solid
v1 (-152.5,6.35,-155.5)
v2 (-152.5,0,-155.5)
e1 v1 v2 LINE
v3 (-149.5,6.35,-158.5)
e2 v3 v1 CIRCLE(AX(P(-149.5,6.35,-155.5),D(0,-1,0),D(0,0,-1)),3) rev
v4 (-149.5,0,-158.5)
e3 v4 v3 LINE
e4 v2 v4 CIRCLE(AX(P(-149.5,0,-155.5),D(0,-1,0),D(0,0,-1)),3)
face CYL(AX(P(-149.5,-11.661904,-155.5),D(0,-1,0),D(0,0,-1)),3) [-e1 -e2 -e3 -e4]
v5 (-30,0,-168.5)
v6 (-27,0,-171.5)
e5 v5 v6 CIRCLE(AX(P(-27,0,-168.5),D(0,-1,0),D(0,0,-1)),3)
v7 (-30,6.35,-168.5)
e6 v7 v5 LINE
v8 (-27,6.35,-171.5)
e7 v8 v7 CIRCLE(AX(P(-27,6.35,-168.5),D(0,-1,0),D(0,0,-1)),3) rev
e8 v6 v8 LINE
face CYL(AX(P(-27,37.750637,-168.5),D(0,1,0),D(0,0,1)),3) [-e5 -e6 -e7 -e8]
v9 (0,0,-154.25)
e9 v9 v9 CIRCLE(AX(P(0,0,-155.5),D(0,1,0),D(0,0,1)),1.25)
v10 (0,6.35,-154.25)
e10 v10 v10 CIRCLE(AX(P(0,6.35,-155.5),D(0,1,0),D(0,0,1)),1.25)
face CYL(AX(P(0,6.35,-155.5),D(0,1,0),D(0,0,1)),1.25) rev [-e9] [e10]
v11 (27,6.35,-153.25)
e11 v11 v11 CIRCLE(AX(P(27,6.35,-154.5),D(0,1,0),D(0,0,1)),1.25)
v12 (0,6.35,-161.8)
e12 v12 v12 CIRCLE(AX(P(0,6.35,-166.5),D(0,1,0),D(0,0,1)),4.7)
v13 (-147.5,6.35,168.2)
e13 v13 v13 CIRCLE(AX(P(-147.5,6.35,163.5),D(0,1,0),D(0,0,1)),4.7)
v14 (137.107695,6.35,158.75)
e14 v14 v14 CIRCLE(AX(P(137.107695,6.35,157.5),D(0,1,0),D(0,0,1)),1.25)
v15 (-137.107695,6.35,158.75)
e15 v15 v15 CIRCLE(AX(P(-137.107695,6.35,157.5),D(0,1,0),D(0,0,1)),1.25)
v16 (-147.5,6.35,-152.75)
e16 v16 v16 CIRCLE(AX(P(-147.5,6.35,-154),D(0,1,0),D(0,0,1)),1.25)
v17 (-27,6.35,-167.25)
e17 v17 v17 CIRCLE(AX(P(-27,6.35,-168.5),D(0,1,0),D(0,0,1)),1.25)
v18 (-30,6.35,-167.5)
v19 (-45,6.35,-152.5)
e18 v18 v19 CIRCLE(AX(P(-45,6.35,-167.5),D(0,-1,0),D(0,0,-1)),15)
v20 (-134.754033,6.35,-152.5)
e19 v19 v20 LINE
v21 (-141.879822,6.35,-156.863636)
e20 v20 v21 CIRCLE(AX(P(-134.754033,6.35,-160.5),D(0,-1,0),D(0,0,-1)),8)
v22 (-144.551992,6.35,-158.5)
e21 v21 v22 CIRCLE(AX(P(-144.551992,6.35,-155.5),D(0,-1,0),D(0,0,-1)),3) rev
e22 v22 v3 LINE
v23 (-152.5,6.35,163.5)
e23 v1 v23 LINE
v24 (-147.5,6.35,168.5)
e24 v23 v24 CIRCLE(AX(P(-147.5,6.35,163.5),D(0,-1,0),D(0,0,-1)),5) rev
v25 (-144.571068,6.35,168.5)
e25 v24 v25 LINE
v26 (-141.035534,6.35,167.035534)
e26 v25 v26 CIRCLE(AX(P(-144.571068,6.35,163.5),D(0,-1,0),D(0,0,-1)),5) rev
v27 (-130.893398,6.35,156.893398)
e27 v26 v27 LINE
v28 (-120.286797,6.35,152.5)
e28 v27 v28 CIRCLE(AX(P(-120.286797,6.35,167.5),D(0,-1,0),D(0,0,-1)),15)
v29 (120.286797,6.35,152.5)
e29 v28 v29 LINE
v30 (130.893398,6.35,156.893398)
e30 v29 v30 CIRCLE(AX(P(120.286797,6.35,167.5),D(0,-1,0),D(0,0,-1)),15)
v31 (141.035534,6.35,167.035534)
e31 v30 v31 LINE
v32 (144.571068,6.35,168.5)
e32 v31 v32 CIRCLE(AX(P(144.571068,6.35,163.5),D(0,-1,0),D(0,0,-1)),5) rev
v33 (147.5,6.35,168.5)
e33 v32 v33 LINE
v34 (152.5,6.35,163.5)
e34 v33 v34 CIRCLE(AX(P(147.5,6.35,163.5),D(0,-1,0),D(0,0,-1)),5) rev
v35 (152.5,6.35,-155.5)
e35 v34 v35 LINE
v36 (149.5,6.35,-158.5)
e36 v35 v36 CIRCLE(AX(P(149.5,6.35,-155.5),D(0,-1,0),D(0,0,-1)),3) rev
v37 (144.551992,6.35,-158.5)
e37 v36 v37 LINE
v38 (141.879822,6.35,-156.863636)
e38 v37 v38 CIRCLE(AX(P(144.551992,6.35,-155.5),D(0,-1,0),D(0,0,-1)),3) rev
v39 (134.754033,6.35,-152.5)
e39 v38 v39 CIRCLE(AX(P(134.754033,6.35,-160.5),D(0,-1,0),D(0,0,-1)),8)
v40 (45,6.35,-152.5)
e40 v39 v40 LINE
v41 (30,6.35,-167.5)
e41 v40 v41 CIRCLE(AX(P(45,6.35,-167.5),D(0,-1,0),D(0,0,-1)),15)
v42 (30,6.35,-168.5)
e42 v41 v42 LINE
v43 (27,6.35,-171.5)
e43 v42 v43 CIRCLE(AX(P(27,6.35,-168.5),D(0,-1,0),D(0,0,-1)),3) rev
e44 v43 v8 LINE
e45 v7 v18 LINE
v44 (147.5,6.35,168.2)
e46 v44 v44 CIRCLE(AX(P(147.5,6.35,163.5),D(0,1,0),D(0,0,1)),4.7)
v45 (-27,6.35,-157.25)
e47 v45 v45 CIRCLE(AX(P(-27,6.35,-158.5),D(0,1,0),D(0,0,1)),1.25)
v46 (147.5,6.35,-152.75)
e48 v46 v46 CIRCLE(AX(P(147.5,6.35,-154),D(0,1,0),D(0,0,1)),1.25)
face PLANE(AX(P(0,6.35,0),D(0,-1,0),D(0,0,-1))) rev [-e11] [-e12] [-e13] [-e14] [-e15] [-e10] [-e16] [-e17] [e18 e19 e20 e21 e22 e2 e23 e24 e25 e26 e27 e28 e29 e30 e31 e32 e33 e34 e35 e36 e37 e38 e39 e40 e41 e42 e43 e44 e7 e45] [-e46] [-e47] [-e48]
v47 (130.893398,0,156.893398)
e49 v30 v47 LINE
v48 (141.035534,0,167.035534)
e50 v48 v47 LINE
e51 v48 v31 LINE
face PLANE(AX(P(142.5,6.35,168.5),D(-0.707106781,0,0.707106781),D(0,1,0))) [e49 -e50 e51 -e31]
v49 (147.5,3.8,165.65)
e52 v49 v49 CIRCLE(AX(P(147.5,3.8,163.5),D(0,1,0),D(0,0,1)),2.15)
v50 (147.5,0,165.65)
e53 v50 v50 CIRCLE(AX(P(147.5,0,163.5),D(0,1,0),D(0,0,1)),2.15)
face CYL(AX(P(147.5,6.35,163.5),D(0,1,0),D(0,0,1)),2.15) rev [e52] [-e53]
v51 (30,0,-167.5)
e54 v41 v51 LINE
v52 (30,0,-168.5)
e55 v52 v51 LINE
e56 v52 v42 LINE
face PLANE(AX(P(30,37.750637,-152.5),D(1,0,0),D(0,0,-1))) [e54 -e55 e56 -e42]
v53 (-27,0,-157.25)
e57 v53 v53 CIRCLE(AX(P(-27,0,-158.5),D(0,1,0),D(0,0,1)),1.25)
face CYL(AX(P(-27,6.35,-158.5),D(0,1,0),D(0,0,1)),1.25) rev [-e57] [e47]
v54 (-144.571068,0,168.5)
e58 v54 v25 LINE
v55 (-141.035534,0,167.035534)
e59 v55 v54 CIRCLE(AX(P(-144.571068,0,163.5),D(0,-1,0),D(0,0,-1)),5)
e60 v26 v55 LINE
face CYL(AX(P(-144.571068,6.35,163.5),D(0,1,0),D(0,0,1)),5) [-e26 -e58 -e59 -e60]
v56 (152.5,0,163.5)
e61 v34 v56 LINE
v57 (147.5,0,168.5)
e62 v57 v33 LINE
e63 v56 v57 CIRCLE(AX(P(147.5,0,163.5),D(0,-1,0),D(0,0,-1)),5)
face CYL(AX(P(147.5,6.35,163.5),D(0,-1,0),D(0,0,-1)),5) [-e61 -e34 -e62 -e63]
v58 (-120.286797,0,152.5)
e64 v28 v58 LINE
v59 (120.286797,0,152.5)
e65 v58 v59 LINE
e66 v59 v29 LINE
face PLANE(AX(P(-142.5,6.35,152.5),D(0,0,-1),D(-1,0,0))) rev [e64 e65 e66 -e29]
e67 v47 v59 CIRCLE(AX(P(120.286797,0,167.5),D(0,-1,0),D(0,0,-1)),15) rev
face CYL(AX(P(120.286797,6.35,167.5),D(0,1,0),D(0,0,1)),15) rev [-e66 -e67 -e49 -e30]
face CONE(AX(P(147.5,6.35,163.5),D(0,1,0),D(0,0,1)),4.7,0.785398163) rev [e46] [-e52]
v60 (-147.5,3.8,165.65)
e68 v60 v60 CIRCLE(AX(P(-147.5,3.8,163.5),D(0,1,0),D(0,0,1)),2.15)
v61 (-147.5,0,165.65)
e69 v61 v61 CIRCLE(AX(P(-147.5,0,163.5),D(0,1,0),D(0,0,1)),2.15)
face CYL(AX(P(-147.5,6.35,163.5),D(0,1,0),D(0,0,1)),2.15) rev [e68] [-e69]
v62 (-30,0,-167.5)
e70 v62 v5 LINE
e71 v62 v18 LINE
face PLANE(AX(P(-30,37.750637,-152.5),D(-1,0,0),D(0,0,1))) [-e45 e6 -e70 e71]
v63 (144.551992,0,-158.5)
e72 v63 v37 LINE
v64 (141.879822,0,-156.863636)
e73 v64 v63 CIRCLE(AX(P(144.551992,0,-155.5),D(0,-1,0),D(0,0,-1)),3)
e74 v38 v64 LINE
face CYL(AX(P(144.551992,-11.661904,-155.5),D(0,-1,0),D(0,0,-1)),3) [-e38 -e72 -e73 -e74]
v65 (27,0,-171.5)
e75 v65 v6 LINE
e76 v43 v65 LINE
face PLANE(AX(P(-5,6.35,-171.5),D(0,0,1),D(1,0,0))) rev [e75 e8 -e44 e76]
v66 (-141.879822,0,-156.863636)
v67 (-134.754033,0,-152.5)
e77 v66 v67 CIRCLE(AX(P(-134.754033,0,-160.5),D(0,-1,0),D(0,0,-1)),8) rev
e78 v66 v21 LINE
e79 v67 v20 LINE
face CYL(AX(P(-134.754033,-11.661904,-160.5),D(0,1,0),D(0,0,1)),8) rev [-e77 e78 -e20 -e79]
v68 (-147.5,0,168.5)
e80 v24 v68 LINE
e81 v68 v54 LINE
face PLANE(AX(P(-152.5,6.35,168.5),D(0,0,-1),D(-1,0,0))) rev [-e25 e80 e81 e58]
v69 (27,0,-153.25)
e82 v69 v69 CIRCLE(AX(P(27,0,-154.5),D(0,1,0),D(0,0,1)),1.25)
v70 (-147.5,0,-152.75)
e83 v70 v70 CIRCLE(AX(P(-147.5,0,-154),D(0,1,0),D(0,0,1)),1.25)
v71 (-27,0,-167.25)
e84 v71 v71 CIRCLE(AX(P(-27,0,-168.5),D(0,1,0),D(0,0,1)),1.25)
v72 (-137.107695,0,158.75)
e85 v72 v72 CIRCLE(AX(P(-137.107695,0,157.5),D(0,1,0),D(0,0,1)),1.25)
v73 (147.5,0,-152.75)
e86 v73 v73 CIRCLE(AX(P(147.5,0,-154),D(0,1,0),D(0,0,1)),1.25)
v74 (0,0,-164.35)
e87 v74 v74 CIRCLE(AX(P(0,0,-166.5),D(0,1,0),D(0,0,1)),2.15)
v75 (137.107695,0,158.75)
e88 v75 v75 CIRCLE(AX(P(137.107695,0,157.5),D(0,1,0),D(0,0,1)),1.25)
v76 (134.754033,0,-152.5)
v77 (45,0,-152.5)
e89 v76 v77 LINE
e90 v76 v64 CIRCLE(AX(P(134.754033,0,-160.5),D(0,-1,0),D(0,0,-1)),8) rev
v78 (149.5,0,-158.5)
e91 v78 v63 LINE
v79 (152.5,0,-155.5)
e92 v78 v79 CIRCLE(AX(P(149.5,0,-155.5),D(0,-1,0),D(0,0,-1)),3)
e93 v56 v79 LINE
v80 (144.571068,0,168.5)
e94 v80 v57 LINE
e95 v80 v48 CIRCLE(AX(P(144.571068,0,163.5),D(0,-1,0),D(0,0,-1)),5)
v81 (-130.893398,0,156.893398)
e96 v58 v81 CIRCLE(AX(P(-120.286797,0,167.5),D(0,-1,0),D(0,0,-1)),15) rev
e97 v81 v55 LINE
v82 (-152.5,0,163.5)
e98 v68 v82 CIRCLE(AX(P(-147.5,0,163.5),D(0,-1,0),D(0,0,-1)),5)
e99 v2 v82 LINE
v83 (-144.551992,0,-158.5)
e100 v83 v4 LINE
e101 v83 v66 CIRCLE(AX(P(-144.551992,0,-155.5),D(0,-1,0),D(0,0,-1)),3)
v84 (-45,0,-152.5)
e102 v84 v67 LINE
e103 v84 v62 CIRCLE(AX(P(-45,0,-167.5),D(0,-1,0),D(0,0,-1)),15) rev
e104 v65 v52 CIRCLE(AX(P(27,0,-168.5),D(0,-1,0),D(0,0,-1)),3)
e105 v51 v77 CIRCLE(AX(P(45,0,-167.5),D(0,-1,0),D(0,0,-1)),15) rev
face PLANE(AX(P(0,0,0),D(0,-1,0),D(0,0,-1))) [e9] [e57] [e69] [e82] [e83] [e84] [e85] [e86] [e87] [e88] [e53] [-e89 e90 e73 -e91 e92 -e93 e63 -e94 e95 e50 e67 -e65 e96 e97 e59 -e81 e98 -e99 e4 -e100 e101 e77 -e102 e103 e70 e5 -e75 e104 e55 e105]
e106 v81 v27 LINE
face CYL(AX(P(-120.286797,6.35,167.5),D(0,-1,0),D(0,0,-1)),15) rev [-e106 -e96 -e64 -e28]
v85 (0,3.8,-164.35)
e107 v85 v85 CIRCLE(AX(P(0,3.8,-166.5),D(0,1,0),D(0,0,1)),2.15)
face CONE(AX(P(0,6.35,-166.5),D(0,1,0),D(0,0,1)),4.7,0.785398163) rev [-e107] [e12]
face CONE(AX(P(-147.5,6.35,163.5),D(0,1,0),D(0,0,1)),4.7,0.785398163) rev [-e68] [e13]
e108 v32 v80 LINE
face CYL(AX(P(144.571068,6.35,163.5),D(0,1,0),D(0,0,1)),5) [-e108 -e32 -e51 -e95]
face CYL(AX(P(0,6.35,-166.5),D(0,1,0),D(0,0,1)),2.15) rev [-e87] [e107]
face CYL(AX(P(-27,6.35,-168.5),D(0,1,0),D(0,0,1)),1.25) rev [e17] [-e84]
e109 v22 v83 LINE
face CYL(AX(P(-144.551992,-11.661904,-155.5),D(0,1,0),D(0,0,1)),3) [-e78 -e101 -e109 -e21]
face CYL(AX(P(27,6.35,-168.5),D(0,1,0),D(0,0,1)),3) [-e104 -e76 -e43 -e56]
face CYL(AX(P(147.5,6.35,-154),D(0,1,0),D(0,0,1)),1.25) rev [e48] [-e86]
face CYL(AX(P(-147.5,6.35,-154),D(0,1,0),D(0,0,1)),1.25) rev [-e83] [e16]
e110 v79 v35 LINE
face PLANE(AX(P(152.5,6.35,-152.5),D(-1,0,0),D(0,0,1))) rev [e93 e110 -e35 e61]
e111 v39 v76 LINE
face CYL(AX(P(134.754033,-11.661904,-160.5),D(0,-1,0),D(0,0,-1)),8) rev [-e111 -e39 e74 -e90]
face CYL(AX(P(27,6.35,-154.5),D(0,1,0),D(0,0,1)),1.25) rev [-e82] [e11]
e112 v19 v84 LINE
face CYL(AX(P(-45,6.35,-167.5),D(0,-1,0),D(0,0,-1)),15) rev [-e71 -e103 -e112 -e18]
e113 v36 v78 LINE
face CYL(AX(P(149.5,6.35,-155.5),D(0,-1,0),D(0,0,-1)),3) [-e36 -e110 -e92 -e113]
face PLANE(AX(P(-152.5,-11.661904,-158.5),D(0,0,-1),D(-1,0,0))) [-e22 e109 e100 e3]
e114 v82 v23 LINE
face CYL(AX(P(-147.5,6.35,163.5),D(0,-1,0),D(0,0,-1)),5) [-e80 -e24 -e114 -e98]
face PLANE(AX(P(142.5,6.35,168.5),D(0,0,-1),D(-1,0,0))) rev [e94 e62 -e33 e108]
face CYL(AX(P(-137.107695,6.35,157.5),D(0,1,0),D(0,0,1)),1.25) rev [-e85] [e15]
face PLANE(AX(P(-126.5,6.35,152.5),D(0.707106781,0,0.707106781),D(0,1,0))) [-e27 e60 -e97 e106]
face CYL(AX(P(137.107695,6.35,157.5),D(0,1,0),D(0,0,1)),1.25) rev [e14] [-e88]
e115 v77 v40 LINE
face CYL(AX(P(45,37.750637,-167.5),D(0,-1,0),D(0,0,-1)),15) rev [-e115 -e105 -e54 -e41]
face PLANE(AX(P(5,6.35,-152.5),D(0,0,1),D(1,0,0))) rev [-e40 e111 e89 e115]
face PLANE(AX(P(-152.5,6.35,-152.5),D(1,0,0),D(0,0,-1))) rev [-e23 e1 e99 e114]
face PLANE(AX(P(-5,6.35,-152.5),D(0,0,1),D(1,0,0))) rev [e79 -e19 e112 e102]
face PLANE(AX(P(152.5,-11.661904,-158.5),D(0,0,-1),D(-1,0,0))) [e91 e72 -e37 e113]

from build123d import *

# Parameters (mm, degrees)
BOSS_EXTRUDE1_DEPTH                             = 6.35
CSK_FOR_M4_FLAT_HEAD_MACHINE_SCREW1_D           = 4.3
CSK_FOR_M4_FLAT_HEAD_MACHINE_SCREW1_CSINK_D     = 9.4
CSK_FOR_M4_FLAT_HEAD_MACHINE_SCREW1_CSINK_ANGLE = 90
CHAMFER1_SIZE                                   = 16
SKETCH6_W                                       = 10
SKETCH6_H                                       = 6
BOSS_EXTRUDE2_DEPTH                             = 6.35
FILLET5_R                                       = 8
M3X0_5_TAPPED_HOLE1_D                           = 2.5
FILLET6_START                                   = -1
FILLET6_DEPTH                                   = 8
SKETCH18_W                                      = 25
SKETCH18_H                                      = 19
BOSS_EXTRUDE4_DEPTH                             = 6.35
FILLET11_R                                      = 15
FILLET12_R                                      = 3
TAP_DRILL_FOR_M3X0_5_TAP2_D                     = 2.5


with BuildPart() as part:
    # Sketch1 → Boss-Extrude1 (new body)
    with BuildSketch(Plane(origin=(0, 0, 0), x_dir=(1, 0, 0), z_dir=(0, 1, 0))):
        Polygon((-5, 171.5), (5, 171.5), (5, 152.5), (152.5, 152.5), (152.5, -168.5), (142.5, -168.5), (142.5, -152.5), (-142.5, -152.5), (-142.5, -168.5), (-152.5, -168.5), (-152.5, 152.5), (-5, 152.5), align=None)
    extrude(amount=BOSS_EXTRUDE1_DEPTH)

    # CSK for M4 Flat Head Machine Screw1 (through all)
    with Locations(Plane(origin=(0, 6.35, 0), x_dir=(1, 0, 0), z_dir=(0, 1, 0))):
        with Locations((0, 166.5), (-147.5, -163.5), (147.5, -163.5)):
            CounterSinkHole(CSK_FOR_M4_FLAT_HEAD_MACHINE_SCREW1_D / 2, CSK_FOR_M4_FLAT_HEAD_MACHINE_SCREW1_CSINK_D / 2, counter_sink_angle=CSK_FOR_M4_FLAT_HEAD_MACHINE_SCREW1_CSINK_ANGLE)

    # Chamfer1
    chamfer1_edges = [part.edges().sort_by_distance(p)[0] for p in [
        (142.5, 3.175, 152.5),
        (-142.5, 3.175, 152.5),
    ]]
    chamfer(chamfer1_edges, length=CHAMFER1_SIZE - 0.0001)  # a hair under: the kernel refuses the full size

    # Sketch6 → Boss-Extrude2 (add)
    with BuildSketch(Plane(origin=(0, 6.35, 0), x_dir=(1, 0, 0), z_dir=(0, 1, 0))):
        with Locations((-147.5, 155.5)):
            Rectangle(SKETCH6_W, SKETCH6_H)
        with Locations((147.5, 155.5)):
            Rectangle(SKETCH6_W, SKETCH6_H)
    extrude(amount=-BOSS_EXTRUDE2_DEPTH)

    # Fillet5
    # the kernel refuses this fillet: 8 mm, written as the material it adds along each edge
    with BuildSketch(Plane(origin=(142.5, 6.35, -152.5), x_dir=(0, 0, -1), z_dir=(0, -1, 0))) as fillet5_piece_1:
        with BuildLine():
            CenterArc((8, -7.745966692), FILLET5_R, 104.477512186, 75.522487814)
            Line((0, -7.745966692), (-0.16, -7.745966692))
            Line((-0.16, -7.745966692), (-0.16, 0))
            Line((-0.16, 0), (0, 0.16))
            ThreePointArc((0, 0.16), (3, 0.16), (5.96, 0.154919334))
            Line((5.96, 0.154919334), (6, 0))
        make_face()
    extrude(amount=6.35)
    with BuildSketch(Plane(origin=(-142.5, 6.35, -152.5), x_dir=(1, 0, 0), z_dir=(0, -1, 0))) as fillet5_piece_2:
        with BuildLine():
            CenterArc((7.745966692, -8), FILLET5_R, 90, 75.522487814)
            Line((0, -6), (-0.154919334, -5.96))
            ThreePointArc((-0.154919334, -5.96), (-0.16, -3), (-0.16, 0))
            Line((-0.16, 0), (0, 0.16))
            Line((0, 0.16), (7.745966692, 0.16))
            Line((7.745966692, 0.16), (7.745966692, 0))
        make_face()
    extrude(amount=6.35)

    # M3x0.5 Tapped Hole1 (through all)
    with Locations(Plane(origin=(0, 6.35, 0), x_dir=(1, 0, 0), z_dir=(0, 1, 0))):
        with Locations((-147.5, 154), (147.5, 154), (137.107695155, -157.5), (-137.107695155, -157.5), (0, 155.5)):
            Hole(M3X0_5_TAPPED_HOLE1_D / 2)

    # Fillet6: read off the stored shape, not the designer's step
    # Fillet6 outline → Fillet6 (cut)
    with BuildSketch(Plane(origin=(0, 0, 0), x_dir=(1, 0, 0), z_dir=(0, 1, 0)).offset(FILLET6_START)):
        with BuildLine():
            ThreePointArc((152.5, -163.5), (151.035533906, -167.035533906), (147.5, -168.5))
            Line((147.5, -168.5), (152.5, -168.5))
            Line((152.5, -168.5), (152.5, -163.5))
        make_face()
        with BuildLine():
            ThreePointArc((144.571067812, -168.5), (142.65765065, -168.119397663), (141.035533906, -167.035533906))
            Line((141.035533906, -167.035533906), (142.5, -168.5))
            Line((142.5, -168.5), (144.571067812, -168.5))
        make_face()
        with BuildLine():
            ThreePointArc((-141.035533906, -167.035533906), (-142.65765065, -168.119397663), (-144.571067812, -168.5))
            Line((-144.571067812, -168.5), (-142.5, -168.5))
            Line((-142.5, -168.5), (-141.035533906, -167.035533906))
        make_face()
        with BuildLine():
            Line((-152.5, -168.5), (-147.5, -168.5))
            ThreePointArc((-147.5, -168.5), (-151.035533906, -167.035533906), (-152.5, -163.5))
            Line((-152.5, -163.5), (-152.5, -168.5))
        make_face()
    extrude(amount=FILLET6_DEPTH, mode=Mode.SUBTRACT)

    # Sketch18 → Boss-Extrude4 (add)
    with BuildSketch(Plane.XZ):
        with Locations((17.5, -162)):
            Rectangle(SKETCH18_W, SKETCH18_H)
        with Locations((-17.5, -162)):
            Rectangle(SKETCH18_W, SKETCH18_H)
    extrude(amount=-BOSS_EXTRUDE4_DEPTH)

    # Fillet11
    fillet11_edges = [part.edges().sort_by_distance(p)[0] for p in [
        (30, 3.175, -152.5),
        (-30, 3.175, -152.5),
        (-126.5001, 3.175, 152.5),
        (126.5001, 3.175, 152.5),
    ]]
    fillet(fillet11_edges, radius=FILLET11_R)

    # Fillet12
    fillet12_edges = [part.edges().sort_by_distance(p)[0] for p in [
        (30, 3.175, -171.5),
        (-30, 3.175, -171.5),
        (-142.5, 3.175, -158.5),
        (-152.5, 3.175, -158.5),
        (142.5, 3.175, -158.5),
        (152.5, 3.175, -158.5),
    ]]
    fillet(fillet12_edges, radius=FILLET12_R)

    # Tap Drill for M3x0.5 Tap2 (through all)
    with Locations(Plane(origin=(0, 6.35, 0), x_dir=(1, 0, 0), z_dir=(0, 1, 0))):
        with Locations((27, 154.5), (-27, 168.5), (-27, 158.5)):
            Hole(TAP_DRILL_FOR_M3X0_5_TAP2_D / 2)


solid = part.part
